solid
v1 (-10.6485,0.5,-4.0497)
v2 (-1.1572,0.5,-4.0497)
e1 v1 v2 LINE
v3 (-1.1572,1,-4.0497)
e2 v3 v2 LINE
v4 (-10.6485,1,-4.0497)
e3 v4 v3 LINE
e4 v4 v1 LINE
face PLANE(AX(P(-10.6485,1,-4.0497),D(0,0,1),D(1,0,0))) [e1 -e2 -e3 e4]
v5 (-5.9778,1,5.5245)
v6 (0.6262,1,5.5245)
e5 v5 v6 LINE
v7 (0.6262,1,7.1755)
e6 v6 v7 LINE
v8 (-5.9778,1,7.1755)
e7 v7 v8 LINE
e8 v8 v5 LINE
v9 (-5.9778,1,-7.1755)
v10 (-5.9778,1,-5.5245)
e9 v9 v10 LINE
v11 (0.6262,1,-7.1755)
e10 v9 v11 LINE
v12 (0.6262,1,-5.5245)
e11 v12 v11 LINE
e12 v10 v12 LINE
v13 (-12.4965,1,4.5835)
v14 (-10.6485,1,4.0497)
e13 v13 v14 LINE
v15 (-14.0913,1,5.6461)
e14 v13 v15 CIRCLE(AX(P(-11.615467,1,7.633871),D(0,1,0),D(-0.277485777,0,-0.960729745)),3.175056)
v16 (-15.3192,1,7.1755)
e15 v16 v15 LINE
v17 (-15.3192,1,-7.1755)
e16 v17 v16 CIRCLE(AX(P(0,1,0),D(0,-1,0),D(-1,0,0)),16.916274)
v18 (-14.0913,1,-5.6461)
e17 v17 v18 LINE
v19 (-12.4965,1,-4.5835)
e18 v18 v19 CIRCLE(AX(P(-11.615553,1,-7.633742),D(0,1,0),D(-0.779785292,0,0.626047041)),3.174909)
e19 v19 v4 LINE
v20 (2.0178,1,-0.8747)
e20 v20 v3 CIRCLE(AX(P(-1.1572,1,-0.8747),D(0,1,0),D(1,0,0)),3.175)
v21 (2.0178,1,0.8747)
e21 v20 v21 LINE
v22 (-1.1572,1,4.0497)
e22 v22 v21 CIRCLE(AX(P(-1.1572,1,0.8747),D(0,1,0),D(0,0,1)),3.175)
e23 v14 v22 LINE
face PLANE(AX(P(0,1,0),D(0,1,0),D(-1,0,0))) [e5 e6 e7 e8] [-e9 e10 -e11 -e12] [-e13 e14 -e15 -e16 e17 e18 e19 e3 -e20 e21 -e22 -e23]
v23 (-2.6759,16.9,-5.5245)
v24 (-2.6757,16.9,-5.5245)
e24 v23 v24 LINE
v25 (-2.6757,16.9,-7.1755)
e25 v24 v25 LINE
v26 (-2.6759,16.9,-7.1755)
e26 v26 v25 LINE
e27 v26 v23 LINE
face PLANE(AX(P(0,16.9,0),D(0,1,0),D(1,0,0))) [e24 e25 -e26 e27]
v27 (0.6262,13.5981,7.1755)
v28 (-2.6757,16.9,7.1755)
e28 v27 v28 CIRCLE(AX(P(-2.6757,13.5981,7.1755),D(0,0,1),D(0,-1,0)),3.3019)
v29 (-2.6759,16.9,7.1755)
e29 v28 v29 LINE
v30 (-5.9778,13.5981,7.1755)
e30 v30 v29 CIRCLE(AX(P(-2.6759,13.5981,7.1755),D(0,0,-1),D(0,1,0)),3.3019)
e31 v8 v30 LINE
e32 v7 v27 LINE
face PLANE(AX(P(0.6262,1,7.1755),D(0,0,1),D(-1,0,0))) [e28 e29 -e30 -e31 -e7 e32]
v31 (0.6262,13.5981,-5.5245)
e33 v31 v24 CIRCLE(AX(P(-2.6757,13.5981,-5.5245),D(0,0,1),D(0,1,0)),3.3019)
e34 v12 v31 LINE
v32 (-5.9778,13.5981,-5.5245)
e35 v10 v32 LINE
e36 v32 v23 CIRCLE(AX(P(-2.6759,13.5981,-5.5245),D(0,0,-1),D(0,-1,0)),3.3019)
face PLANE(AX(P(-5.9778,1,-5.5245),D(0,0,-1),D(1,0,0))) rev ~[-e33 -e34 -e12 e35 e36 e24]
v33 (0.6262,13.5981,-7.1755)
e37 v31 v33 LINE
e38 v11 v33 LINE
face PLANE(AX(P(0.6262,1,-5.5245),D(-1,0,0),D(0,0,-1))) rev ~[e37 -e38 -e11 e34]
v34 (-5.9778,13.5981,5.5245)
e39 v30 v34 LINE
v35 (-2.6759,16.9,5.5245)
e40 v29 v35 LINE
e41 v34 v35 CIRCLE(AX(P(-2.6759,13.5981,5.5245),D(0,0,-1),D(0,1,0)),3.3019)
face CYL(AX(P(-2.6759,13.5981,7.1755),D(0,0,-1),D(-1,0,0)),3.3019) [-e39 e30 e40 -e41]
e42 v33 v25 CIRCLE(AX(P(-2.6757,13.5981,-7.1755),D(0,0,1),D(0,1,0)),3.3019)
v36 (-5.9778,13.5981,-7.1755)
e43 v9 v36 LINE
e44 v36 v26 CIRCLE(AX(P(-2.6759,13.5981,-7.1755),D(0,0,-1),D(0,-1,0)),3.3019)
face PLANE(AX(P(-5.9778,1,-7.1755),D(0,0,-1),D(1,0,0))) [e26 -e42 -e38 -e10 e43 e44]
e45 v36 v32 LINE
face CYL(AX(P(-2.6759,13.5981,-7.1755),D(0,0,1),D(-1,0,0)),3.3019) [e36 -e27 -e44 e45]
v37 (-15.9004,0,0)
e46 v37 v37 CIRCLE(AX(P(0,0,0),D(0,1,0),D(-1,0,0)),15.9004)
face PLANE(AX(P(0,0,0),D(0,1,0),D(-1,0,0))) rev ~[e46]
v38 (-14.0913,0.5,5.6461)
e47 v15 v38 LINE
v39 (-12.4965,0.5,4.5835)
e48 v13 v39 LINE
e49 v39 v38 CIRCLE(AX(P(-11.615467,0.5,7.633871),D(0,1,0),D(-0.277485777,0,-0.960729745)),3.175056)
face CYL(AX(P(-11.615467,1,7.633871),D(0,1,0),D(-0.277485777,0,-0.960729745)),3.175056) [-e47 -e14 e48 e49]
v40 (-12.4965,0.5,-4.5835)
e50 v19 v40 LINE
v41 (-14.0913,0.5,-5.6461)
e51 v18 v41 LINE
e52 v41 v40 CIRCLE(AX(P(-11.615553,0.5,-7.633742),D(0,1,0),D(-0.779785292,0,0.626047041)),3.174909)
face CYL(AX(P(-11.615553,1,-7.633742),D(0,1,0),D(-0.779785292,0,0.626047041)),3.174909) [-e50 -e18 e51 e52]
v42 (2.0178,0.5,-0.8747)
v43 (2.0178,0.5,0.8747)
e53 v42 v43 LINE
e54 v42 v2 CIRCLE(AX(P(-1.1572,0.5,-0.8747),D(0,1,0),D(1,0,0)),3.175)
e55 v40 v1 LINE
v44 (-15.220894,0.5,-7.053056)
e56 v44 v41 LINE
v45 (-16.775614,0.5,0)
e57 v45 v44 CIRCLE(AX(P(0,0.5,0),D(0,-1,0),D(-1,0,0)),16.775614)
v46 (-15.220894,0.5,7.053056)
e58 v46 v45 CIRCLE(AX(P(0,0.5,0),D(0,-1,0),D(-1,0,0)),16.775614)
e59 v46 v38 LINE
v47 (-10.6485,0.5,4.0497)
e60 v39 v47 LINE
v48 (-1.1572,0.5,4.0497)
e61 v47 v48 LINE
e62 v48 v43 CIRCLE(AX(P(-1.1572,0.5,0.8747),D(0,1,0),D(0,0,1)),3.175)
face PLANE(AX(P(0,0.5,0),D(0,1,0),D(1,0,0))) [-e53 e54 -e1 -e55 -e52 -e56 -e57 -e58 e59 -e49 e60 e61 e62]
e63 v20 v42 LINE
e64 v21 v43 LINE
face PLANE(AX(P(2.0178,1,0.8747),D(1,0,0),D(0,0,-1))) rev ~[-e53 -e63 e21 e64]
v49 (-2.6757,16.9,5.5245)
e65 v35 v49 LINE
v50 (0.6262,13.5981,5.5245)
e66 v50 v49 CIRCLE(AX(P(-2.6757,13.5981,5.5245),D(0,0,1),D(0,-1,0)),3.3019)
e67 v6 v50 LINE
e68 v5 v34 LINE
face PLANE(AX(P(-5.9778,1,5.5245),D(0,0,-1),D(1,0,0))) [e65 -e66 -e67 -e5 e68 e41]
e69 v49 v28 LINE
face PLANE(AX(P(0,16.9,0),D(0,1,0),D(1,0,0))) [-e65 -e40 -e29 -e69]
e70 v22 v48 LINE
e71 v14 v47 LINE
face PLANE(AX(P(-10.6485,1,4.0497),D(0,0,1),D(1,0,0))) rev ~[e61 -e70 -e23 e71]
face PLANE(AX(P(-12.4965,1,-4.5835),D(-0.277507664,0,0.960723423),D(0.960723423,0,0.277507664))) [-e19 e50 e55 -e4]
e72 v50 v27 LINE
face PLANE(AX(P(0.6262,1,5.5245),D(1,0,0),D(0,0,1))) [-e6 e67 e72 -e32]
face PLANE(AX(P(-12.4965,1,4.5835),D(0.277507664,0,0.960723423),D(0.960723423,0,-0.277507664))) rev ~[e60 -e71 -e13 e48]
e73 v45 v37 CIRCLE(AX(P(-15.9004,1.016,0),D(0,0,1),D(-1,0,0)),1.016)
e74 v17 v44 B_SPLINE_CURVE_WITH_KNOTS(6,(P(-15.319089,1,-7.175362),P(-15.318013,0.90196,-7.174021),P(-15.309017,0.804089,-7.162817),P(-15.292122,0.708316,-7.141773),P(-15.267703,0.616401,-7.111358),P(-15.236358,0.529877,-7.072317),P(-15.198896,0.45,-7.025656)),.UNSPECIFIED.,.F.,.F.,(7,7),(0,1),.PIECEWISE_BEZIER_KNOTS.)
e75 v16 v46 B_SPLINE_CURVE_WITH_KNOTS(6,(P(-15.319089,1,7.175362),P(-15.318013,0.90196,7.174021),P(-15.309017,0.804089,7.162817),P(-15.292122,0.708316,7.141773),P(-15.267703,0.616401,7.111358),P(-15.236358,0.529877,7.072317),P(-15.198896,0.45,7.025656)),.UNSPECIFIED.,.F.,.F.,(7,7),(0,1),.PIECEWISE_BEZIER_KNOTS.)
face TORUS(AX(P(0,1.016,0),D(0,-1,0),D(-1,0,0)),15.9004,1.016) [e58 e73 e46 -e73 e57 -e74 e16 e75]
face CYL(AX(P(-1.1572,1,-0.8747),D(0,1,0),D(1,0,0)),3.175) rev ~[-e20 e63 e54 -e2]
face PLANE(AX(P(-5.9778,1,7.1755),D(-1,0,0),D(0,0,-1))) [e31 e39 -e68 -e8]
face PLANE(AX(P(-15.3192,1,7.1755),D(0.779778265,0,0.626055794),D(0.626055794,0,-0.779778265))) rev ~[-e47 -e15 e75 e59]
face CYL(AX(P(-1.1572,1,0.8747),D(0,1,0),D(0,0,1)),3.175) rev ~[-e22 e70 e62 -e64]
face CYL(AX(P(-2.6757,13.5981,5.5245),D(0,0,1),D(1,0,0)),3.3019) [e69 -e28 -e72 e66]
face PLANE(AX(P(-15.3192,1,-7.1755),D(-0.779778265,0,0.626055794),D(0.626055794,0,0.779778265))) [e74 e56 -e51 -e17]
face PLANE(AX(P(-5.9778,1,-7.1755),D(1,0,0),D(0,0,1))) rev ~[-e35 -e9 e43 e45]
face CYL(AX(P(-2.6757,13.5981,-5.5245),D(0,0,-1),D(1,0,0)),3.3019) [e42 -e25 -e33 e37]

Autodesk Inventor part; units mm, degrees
ref_plane "YZ Plane" through (0, 0, 0) normal (1, 0, 0) x (0, 1, 0)
ref_plane "XZ Plane" through (0, 0, 0) normal (0, 1, 0) x (-1, 0, 0)
ref_plane "XY Plane" through (0, 0, 0) normal (0, 0, 1) x (1, 0, 0)
sketch "Sketch1" plane through (0, 0, 0) normal (0, 1, 0) x (-1, 0, 0)
  circle A0 centre (0, 0) radius 16.9164
  dimension "d0" = 33.8328
extrude "Extrusion1" add sketch "Sketch1" along normal blind 1
fillet "Fillet1" radius 1.016 1 edges at (16.9164, 0, 0)
sketch "Sketch2" plane through (0, 1, 0) normal (0, 1, 0) x (1, 0, 0)
  circle A0 centre (0, 0) radius 16.9164 projected
  line L0 (-0.1238, 7.1755) -> (0.6262, 7.1755) construction
  line L1 (-0.1238, 7.1755) -> (-0.8738, 7.1755) construction
  line L2 (0.6262, 7.1755) -> (-5.9778, 7.1755) construction
  line L3 (-5.9778, 7.1755) -> (-5.9778, 5.5245)
  line L4 (-5.9778, 5.5245) -> (0.6262, 5.5245)
  line L5 (0.6262, 5.5245) -> (0.6262, 7.1755)
  line L6 (0.6262, -7.1755) -> (-5.9778, -7.1755)
  line L7 (-5.9778, -7.1755) -> (-5.9778, -5.5245)
  line L8 (-5.9778, -5.5245) -> (0.6262, -5.5245)
  line L9 (0.6262, -5.5245) -> (0.6262, -7.1755)
  line L10 (0.6262, 6.35) -> (-5.9778, 6.35) construction
  line L11 (0.6262, -6.35) -> (-5.9778, -6.35) construction
  line L12 (-5.9778, 7.1755) -> (0.6262, 7.1755)
  line L13 (-2.6758, 6.35) -> (-2.6758, 16.7034) construction
  line L14 (-2.6758, -6.35) -> (-2.6758, -16.7034) construction
  line L15 (-5.9778, 7.1755) -> (-15.3192, 7.1755) construction
  line L16 (-5.9778, -7.1755) -> (-15.3192, -7.1755) construction
  line L17 (-15.3192, 7.1755) -> (-14.0913, 5.6461)
  line L18 (-12.4965, 4.5835) -> (-10.6485, 4.0497)
  line L19 (-10.6485, 4.0497) -> (-1.1572, 4.0497)
  line L20 (-10.6485, 4.0497) -> (-13.4621, 4.8624) construction
  line L21 (-13.4621, 4.8624) -> (-15.3192, 7.1755) construction
  line L22 (2.0178, 0.8747) -> (2.0178, 0)
  line L23 (2.0178, 0) -> (-20.8537, 0) construction
  line L24 (-15.3192, -7.1755) -> (-14.0913, -5.6461)
  line L25 (-12.4965, -4.5835) -> (-10.6485, -4.0497)
  line L26 (-10.6485, -4.0497) -> (-1.1572, -4.0497)
  line L27 (-10.6485, -4.0497) -> (-13.4621, -4.8624) construction
  line L28 (2.0178, -0.8747) -> (2.0178, 0)
  arc A1 (2.0178, 0.8747) -> (-1.1572, 4.0497) centre (-1.1572, 0.8747) ccw
  arc A2 (-1.1572, -4.0497) -> (2.0178, -0.8747) centre (-1.1572, -0.8747) ccw
  arc A3 (-14.0913, 5.6461) -> (-12.4965, 4.5835) centre (-11.6155, 7.6338) ccw
  arc A4 (-12.4965, -4.5835) -> (-14.0913, -5.6461) centre (-11.6155, -7.6338) ccw
  point P0 (-0.1238, -4.822)
  point P1 (-13.4621, 4.8624)
  point P2 (2.0178, 4.0497)
  point P3 (-13.4621, -4.8624)
  point P4 (2.0178, -4.0497)
  dimension "d17" = 6.604
  dimension "d18" = 1.651
  dimension "d20" = 12.7
  dimension "d21" = 6.604
  dimension "d22" = 1.651
  dimension "d28" = 3.175
sketch "Sketch3" plane through (0, 1, 0) normal (0, 1, 0) x (1, 0, 0)
  point P0 (0, 0)
extrude "Extrusion2" add sketch "Sketch2" along normal blind 15.9 contours L6 L7 L8 L9
extrude "Extrusion3" add sketch "Sketch2" along normal blind 15.9 contours L12 L5 L4 L3
fillet "Fillet2" radius 3.302 4 edges at (-5.9778, 16.9, 6.35) (0.6262, 16.9, 6.35) (-5.9778, 16.9, -6.35) (0.6262, 16.9, -6.35)
extrude "Extrusion4" cut sketch "Sketch2" against normal blind 0.5 contours L17 A3 L18 L19 A1 L22 L28 A2 L26 L25 A4 L24 A0 picked at (-4.321, -1.3499)
properties part number "Replacemnet part(wall socket)"
